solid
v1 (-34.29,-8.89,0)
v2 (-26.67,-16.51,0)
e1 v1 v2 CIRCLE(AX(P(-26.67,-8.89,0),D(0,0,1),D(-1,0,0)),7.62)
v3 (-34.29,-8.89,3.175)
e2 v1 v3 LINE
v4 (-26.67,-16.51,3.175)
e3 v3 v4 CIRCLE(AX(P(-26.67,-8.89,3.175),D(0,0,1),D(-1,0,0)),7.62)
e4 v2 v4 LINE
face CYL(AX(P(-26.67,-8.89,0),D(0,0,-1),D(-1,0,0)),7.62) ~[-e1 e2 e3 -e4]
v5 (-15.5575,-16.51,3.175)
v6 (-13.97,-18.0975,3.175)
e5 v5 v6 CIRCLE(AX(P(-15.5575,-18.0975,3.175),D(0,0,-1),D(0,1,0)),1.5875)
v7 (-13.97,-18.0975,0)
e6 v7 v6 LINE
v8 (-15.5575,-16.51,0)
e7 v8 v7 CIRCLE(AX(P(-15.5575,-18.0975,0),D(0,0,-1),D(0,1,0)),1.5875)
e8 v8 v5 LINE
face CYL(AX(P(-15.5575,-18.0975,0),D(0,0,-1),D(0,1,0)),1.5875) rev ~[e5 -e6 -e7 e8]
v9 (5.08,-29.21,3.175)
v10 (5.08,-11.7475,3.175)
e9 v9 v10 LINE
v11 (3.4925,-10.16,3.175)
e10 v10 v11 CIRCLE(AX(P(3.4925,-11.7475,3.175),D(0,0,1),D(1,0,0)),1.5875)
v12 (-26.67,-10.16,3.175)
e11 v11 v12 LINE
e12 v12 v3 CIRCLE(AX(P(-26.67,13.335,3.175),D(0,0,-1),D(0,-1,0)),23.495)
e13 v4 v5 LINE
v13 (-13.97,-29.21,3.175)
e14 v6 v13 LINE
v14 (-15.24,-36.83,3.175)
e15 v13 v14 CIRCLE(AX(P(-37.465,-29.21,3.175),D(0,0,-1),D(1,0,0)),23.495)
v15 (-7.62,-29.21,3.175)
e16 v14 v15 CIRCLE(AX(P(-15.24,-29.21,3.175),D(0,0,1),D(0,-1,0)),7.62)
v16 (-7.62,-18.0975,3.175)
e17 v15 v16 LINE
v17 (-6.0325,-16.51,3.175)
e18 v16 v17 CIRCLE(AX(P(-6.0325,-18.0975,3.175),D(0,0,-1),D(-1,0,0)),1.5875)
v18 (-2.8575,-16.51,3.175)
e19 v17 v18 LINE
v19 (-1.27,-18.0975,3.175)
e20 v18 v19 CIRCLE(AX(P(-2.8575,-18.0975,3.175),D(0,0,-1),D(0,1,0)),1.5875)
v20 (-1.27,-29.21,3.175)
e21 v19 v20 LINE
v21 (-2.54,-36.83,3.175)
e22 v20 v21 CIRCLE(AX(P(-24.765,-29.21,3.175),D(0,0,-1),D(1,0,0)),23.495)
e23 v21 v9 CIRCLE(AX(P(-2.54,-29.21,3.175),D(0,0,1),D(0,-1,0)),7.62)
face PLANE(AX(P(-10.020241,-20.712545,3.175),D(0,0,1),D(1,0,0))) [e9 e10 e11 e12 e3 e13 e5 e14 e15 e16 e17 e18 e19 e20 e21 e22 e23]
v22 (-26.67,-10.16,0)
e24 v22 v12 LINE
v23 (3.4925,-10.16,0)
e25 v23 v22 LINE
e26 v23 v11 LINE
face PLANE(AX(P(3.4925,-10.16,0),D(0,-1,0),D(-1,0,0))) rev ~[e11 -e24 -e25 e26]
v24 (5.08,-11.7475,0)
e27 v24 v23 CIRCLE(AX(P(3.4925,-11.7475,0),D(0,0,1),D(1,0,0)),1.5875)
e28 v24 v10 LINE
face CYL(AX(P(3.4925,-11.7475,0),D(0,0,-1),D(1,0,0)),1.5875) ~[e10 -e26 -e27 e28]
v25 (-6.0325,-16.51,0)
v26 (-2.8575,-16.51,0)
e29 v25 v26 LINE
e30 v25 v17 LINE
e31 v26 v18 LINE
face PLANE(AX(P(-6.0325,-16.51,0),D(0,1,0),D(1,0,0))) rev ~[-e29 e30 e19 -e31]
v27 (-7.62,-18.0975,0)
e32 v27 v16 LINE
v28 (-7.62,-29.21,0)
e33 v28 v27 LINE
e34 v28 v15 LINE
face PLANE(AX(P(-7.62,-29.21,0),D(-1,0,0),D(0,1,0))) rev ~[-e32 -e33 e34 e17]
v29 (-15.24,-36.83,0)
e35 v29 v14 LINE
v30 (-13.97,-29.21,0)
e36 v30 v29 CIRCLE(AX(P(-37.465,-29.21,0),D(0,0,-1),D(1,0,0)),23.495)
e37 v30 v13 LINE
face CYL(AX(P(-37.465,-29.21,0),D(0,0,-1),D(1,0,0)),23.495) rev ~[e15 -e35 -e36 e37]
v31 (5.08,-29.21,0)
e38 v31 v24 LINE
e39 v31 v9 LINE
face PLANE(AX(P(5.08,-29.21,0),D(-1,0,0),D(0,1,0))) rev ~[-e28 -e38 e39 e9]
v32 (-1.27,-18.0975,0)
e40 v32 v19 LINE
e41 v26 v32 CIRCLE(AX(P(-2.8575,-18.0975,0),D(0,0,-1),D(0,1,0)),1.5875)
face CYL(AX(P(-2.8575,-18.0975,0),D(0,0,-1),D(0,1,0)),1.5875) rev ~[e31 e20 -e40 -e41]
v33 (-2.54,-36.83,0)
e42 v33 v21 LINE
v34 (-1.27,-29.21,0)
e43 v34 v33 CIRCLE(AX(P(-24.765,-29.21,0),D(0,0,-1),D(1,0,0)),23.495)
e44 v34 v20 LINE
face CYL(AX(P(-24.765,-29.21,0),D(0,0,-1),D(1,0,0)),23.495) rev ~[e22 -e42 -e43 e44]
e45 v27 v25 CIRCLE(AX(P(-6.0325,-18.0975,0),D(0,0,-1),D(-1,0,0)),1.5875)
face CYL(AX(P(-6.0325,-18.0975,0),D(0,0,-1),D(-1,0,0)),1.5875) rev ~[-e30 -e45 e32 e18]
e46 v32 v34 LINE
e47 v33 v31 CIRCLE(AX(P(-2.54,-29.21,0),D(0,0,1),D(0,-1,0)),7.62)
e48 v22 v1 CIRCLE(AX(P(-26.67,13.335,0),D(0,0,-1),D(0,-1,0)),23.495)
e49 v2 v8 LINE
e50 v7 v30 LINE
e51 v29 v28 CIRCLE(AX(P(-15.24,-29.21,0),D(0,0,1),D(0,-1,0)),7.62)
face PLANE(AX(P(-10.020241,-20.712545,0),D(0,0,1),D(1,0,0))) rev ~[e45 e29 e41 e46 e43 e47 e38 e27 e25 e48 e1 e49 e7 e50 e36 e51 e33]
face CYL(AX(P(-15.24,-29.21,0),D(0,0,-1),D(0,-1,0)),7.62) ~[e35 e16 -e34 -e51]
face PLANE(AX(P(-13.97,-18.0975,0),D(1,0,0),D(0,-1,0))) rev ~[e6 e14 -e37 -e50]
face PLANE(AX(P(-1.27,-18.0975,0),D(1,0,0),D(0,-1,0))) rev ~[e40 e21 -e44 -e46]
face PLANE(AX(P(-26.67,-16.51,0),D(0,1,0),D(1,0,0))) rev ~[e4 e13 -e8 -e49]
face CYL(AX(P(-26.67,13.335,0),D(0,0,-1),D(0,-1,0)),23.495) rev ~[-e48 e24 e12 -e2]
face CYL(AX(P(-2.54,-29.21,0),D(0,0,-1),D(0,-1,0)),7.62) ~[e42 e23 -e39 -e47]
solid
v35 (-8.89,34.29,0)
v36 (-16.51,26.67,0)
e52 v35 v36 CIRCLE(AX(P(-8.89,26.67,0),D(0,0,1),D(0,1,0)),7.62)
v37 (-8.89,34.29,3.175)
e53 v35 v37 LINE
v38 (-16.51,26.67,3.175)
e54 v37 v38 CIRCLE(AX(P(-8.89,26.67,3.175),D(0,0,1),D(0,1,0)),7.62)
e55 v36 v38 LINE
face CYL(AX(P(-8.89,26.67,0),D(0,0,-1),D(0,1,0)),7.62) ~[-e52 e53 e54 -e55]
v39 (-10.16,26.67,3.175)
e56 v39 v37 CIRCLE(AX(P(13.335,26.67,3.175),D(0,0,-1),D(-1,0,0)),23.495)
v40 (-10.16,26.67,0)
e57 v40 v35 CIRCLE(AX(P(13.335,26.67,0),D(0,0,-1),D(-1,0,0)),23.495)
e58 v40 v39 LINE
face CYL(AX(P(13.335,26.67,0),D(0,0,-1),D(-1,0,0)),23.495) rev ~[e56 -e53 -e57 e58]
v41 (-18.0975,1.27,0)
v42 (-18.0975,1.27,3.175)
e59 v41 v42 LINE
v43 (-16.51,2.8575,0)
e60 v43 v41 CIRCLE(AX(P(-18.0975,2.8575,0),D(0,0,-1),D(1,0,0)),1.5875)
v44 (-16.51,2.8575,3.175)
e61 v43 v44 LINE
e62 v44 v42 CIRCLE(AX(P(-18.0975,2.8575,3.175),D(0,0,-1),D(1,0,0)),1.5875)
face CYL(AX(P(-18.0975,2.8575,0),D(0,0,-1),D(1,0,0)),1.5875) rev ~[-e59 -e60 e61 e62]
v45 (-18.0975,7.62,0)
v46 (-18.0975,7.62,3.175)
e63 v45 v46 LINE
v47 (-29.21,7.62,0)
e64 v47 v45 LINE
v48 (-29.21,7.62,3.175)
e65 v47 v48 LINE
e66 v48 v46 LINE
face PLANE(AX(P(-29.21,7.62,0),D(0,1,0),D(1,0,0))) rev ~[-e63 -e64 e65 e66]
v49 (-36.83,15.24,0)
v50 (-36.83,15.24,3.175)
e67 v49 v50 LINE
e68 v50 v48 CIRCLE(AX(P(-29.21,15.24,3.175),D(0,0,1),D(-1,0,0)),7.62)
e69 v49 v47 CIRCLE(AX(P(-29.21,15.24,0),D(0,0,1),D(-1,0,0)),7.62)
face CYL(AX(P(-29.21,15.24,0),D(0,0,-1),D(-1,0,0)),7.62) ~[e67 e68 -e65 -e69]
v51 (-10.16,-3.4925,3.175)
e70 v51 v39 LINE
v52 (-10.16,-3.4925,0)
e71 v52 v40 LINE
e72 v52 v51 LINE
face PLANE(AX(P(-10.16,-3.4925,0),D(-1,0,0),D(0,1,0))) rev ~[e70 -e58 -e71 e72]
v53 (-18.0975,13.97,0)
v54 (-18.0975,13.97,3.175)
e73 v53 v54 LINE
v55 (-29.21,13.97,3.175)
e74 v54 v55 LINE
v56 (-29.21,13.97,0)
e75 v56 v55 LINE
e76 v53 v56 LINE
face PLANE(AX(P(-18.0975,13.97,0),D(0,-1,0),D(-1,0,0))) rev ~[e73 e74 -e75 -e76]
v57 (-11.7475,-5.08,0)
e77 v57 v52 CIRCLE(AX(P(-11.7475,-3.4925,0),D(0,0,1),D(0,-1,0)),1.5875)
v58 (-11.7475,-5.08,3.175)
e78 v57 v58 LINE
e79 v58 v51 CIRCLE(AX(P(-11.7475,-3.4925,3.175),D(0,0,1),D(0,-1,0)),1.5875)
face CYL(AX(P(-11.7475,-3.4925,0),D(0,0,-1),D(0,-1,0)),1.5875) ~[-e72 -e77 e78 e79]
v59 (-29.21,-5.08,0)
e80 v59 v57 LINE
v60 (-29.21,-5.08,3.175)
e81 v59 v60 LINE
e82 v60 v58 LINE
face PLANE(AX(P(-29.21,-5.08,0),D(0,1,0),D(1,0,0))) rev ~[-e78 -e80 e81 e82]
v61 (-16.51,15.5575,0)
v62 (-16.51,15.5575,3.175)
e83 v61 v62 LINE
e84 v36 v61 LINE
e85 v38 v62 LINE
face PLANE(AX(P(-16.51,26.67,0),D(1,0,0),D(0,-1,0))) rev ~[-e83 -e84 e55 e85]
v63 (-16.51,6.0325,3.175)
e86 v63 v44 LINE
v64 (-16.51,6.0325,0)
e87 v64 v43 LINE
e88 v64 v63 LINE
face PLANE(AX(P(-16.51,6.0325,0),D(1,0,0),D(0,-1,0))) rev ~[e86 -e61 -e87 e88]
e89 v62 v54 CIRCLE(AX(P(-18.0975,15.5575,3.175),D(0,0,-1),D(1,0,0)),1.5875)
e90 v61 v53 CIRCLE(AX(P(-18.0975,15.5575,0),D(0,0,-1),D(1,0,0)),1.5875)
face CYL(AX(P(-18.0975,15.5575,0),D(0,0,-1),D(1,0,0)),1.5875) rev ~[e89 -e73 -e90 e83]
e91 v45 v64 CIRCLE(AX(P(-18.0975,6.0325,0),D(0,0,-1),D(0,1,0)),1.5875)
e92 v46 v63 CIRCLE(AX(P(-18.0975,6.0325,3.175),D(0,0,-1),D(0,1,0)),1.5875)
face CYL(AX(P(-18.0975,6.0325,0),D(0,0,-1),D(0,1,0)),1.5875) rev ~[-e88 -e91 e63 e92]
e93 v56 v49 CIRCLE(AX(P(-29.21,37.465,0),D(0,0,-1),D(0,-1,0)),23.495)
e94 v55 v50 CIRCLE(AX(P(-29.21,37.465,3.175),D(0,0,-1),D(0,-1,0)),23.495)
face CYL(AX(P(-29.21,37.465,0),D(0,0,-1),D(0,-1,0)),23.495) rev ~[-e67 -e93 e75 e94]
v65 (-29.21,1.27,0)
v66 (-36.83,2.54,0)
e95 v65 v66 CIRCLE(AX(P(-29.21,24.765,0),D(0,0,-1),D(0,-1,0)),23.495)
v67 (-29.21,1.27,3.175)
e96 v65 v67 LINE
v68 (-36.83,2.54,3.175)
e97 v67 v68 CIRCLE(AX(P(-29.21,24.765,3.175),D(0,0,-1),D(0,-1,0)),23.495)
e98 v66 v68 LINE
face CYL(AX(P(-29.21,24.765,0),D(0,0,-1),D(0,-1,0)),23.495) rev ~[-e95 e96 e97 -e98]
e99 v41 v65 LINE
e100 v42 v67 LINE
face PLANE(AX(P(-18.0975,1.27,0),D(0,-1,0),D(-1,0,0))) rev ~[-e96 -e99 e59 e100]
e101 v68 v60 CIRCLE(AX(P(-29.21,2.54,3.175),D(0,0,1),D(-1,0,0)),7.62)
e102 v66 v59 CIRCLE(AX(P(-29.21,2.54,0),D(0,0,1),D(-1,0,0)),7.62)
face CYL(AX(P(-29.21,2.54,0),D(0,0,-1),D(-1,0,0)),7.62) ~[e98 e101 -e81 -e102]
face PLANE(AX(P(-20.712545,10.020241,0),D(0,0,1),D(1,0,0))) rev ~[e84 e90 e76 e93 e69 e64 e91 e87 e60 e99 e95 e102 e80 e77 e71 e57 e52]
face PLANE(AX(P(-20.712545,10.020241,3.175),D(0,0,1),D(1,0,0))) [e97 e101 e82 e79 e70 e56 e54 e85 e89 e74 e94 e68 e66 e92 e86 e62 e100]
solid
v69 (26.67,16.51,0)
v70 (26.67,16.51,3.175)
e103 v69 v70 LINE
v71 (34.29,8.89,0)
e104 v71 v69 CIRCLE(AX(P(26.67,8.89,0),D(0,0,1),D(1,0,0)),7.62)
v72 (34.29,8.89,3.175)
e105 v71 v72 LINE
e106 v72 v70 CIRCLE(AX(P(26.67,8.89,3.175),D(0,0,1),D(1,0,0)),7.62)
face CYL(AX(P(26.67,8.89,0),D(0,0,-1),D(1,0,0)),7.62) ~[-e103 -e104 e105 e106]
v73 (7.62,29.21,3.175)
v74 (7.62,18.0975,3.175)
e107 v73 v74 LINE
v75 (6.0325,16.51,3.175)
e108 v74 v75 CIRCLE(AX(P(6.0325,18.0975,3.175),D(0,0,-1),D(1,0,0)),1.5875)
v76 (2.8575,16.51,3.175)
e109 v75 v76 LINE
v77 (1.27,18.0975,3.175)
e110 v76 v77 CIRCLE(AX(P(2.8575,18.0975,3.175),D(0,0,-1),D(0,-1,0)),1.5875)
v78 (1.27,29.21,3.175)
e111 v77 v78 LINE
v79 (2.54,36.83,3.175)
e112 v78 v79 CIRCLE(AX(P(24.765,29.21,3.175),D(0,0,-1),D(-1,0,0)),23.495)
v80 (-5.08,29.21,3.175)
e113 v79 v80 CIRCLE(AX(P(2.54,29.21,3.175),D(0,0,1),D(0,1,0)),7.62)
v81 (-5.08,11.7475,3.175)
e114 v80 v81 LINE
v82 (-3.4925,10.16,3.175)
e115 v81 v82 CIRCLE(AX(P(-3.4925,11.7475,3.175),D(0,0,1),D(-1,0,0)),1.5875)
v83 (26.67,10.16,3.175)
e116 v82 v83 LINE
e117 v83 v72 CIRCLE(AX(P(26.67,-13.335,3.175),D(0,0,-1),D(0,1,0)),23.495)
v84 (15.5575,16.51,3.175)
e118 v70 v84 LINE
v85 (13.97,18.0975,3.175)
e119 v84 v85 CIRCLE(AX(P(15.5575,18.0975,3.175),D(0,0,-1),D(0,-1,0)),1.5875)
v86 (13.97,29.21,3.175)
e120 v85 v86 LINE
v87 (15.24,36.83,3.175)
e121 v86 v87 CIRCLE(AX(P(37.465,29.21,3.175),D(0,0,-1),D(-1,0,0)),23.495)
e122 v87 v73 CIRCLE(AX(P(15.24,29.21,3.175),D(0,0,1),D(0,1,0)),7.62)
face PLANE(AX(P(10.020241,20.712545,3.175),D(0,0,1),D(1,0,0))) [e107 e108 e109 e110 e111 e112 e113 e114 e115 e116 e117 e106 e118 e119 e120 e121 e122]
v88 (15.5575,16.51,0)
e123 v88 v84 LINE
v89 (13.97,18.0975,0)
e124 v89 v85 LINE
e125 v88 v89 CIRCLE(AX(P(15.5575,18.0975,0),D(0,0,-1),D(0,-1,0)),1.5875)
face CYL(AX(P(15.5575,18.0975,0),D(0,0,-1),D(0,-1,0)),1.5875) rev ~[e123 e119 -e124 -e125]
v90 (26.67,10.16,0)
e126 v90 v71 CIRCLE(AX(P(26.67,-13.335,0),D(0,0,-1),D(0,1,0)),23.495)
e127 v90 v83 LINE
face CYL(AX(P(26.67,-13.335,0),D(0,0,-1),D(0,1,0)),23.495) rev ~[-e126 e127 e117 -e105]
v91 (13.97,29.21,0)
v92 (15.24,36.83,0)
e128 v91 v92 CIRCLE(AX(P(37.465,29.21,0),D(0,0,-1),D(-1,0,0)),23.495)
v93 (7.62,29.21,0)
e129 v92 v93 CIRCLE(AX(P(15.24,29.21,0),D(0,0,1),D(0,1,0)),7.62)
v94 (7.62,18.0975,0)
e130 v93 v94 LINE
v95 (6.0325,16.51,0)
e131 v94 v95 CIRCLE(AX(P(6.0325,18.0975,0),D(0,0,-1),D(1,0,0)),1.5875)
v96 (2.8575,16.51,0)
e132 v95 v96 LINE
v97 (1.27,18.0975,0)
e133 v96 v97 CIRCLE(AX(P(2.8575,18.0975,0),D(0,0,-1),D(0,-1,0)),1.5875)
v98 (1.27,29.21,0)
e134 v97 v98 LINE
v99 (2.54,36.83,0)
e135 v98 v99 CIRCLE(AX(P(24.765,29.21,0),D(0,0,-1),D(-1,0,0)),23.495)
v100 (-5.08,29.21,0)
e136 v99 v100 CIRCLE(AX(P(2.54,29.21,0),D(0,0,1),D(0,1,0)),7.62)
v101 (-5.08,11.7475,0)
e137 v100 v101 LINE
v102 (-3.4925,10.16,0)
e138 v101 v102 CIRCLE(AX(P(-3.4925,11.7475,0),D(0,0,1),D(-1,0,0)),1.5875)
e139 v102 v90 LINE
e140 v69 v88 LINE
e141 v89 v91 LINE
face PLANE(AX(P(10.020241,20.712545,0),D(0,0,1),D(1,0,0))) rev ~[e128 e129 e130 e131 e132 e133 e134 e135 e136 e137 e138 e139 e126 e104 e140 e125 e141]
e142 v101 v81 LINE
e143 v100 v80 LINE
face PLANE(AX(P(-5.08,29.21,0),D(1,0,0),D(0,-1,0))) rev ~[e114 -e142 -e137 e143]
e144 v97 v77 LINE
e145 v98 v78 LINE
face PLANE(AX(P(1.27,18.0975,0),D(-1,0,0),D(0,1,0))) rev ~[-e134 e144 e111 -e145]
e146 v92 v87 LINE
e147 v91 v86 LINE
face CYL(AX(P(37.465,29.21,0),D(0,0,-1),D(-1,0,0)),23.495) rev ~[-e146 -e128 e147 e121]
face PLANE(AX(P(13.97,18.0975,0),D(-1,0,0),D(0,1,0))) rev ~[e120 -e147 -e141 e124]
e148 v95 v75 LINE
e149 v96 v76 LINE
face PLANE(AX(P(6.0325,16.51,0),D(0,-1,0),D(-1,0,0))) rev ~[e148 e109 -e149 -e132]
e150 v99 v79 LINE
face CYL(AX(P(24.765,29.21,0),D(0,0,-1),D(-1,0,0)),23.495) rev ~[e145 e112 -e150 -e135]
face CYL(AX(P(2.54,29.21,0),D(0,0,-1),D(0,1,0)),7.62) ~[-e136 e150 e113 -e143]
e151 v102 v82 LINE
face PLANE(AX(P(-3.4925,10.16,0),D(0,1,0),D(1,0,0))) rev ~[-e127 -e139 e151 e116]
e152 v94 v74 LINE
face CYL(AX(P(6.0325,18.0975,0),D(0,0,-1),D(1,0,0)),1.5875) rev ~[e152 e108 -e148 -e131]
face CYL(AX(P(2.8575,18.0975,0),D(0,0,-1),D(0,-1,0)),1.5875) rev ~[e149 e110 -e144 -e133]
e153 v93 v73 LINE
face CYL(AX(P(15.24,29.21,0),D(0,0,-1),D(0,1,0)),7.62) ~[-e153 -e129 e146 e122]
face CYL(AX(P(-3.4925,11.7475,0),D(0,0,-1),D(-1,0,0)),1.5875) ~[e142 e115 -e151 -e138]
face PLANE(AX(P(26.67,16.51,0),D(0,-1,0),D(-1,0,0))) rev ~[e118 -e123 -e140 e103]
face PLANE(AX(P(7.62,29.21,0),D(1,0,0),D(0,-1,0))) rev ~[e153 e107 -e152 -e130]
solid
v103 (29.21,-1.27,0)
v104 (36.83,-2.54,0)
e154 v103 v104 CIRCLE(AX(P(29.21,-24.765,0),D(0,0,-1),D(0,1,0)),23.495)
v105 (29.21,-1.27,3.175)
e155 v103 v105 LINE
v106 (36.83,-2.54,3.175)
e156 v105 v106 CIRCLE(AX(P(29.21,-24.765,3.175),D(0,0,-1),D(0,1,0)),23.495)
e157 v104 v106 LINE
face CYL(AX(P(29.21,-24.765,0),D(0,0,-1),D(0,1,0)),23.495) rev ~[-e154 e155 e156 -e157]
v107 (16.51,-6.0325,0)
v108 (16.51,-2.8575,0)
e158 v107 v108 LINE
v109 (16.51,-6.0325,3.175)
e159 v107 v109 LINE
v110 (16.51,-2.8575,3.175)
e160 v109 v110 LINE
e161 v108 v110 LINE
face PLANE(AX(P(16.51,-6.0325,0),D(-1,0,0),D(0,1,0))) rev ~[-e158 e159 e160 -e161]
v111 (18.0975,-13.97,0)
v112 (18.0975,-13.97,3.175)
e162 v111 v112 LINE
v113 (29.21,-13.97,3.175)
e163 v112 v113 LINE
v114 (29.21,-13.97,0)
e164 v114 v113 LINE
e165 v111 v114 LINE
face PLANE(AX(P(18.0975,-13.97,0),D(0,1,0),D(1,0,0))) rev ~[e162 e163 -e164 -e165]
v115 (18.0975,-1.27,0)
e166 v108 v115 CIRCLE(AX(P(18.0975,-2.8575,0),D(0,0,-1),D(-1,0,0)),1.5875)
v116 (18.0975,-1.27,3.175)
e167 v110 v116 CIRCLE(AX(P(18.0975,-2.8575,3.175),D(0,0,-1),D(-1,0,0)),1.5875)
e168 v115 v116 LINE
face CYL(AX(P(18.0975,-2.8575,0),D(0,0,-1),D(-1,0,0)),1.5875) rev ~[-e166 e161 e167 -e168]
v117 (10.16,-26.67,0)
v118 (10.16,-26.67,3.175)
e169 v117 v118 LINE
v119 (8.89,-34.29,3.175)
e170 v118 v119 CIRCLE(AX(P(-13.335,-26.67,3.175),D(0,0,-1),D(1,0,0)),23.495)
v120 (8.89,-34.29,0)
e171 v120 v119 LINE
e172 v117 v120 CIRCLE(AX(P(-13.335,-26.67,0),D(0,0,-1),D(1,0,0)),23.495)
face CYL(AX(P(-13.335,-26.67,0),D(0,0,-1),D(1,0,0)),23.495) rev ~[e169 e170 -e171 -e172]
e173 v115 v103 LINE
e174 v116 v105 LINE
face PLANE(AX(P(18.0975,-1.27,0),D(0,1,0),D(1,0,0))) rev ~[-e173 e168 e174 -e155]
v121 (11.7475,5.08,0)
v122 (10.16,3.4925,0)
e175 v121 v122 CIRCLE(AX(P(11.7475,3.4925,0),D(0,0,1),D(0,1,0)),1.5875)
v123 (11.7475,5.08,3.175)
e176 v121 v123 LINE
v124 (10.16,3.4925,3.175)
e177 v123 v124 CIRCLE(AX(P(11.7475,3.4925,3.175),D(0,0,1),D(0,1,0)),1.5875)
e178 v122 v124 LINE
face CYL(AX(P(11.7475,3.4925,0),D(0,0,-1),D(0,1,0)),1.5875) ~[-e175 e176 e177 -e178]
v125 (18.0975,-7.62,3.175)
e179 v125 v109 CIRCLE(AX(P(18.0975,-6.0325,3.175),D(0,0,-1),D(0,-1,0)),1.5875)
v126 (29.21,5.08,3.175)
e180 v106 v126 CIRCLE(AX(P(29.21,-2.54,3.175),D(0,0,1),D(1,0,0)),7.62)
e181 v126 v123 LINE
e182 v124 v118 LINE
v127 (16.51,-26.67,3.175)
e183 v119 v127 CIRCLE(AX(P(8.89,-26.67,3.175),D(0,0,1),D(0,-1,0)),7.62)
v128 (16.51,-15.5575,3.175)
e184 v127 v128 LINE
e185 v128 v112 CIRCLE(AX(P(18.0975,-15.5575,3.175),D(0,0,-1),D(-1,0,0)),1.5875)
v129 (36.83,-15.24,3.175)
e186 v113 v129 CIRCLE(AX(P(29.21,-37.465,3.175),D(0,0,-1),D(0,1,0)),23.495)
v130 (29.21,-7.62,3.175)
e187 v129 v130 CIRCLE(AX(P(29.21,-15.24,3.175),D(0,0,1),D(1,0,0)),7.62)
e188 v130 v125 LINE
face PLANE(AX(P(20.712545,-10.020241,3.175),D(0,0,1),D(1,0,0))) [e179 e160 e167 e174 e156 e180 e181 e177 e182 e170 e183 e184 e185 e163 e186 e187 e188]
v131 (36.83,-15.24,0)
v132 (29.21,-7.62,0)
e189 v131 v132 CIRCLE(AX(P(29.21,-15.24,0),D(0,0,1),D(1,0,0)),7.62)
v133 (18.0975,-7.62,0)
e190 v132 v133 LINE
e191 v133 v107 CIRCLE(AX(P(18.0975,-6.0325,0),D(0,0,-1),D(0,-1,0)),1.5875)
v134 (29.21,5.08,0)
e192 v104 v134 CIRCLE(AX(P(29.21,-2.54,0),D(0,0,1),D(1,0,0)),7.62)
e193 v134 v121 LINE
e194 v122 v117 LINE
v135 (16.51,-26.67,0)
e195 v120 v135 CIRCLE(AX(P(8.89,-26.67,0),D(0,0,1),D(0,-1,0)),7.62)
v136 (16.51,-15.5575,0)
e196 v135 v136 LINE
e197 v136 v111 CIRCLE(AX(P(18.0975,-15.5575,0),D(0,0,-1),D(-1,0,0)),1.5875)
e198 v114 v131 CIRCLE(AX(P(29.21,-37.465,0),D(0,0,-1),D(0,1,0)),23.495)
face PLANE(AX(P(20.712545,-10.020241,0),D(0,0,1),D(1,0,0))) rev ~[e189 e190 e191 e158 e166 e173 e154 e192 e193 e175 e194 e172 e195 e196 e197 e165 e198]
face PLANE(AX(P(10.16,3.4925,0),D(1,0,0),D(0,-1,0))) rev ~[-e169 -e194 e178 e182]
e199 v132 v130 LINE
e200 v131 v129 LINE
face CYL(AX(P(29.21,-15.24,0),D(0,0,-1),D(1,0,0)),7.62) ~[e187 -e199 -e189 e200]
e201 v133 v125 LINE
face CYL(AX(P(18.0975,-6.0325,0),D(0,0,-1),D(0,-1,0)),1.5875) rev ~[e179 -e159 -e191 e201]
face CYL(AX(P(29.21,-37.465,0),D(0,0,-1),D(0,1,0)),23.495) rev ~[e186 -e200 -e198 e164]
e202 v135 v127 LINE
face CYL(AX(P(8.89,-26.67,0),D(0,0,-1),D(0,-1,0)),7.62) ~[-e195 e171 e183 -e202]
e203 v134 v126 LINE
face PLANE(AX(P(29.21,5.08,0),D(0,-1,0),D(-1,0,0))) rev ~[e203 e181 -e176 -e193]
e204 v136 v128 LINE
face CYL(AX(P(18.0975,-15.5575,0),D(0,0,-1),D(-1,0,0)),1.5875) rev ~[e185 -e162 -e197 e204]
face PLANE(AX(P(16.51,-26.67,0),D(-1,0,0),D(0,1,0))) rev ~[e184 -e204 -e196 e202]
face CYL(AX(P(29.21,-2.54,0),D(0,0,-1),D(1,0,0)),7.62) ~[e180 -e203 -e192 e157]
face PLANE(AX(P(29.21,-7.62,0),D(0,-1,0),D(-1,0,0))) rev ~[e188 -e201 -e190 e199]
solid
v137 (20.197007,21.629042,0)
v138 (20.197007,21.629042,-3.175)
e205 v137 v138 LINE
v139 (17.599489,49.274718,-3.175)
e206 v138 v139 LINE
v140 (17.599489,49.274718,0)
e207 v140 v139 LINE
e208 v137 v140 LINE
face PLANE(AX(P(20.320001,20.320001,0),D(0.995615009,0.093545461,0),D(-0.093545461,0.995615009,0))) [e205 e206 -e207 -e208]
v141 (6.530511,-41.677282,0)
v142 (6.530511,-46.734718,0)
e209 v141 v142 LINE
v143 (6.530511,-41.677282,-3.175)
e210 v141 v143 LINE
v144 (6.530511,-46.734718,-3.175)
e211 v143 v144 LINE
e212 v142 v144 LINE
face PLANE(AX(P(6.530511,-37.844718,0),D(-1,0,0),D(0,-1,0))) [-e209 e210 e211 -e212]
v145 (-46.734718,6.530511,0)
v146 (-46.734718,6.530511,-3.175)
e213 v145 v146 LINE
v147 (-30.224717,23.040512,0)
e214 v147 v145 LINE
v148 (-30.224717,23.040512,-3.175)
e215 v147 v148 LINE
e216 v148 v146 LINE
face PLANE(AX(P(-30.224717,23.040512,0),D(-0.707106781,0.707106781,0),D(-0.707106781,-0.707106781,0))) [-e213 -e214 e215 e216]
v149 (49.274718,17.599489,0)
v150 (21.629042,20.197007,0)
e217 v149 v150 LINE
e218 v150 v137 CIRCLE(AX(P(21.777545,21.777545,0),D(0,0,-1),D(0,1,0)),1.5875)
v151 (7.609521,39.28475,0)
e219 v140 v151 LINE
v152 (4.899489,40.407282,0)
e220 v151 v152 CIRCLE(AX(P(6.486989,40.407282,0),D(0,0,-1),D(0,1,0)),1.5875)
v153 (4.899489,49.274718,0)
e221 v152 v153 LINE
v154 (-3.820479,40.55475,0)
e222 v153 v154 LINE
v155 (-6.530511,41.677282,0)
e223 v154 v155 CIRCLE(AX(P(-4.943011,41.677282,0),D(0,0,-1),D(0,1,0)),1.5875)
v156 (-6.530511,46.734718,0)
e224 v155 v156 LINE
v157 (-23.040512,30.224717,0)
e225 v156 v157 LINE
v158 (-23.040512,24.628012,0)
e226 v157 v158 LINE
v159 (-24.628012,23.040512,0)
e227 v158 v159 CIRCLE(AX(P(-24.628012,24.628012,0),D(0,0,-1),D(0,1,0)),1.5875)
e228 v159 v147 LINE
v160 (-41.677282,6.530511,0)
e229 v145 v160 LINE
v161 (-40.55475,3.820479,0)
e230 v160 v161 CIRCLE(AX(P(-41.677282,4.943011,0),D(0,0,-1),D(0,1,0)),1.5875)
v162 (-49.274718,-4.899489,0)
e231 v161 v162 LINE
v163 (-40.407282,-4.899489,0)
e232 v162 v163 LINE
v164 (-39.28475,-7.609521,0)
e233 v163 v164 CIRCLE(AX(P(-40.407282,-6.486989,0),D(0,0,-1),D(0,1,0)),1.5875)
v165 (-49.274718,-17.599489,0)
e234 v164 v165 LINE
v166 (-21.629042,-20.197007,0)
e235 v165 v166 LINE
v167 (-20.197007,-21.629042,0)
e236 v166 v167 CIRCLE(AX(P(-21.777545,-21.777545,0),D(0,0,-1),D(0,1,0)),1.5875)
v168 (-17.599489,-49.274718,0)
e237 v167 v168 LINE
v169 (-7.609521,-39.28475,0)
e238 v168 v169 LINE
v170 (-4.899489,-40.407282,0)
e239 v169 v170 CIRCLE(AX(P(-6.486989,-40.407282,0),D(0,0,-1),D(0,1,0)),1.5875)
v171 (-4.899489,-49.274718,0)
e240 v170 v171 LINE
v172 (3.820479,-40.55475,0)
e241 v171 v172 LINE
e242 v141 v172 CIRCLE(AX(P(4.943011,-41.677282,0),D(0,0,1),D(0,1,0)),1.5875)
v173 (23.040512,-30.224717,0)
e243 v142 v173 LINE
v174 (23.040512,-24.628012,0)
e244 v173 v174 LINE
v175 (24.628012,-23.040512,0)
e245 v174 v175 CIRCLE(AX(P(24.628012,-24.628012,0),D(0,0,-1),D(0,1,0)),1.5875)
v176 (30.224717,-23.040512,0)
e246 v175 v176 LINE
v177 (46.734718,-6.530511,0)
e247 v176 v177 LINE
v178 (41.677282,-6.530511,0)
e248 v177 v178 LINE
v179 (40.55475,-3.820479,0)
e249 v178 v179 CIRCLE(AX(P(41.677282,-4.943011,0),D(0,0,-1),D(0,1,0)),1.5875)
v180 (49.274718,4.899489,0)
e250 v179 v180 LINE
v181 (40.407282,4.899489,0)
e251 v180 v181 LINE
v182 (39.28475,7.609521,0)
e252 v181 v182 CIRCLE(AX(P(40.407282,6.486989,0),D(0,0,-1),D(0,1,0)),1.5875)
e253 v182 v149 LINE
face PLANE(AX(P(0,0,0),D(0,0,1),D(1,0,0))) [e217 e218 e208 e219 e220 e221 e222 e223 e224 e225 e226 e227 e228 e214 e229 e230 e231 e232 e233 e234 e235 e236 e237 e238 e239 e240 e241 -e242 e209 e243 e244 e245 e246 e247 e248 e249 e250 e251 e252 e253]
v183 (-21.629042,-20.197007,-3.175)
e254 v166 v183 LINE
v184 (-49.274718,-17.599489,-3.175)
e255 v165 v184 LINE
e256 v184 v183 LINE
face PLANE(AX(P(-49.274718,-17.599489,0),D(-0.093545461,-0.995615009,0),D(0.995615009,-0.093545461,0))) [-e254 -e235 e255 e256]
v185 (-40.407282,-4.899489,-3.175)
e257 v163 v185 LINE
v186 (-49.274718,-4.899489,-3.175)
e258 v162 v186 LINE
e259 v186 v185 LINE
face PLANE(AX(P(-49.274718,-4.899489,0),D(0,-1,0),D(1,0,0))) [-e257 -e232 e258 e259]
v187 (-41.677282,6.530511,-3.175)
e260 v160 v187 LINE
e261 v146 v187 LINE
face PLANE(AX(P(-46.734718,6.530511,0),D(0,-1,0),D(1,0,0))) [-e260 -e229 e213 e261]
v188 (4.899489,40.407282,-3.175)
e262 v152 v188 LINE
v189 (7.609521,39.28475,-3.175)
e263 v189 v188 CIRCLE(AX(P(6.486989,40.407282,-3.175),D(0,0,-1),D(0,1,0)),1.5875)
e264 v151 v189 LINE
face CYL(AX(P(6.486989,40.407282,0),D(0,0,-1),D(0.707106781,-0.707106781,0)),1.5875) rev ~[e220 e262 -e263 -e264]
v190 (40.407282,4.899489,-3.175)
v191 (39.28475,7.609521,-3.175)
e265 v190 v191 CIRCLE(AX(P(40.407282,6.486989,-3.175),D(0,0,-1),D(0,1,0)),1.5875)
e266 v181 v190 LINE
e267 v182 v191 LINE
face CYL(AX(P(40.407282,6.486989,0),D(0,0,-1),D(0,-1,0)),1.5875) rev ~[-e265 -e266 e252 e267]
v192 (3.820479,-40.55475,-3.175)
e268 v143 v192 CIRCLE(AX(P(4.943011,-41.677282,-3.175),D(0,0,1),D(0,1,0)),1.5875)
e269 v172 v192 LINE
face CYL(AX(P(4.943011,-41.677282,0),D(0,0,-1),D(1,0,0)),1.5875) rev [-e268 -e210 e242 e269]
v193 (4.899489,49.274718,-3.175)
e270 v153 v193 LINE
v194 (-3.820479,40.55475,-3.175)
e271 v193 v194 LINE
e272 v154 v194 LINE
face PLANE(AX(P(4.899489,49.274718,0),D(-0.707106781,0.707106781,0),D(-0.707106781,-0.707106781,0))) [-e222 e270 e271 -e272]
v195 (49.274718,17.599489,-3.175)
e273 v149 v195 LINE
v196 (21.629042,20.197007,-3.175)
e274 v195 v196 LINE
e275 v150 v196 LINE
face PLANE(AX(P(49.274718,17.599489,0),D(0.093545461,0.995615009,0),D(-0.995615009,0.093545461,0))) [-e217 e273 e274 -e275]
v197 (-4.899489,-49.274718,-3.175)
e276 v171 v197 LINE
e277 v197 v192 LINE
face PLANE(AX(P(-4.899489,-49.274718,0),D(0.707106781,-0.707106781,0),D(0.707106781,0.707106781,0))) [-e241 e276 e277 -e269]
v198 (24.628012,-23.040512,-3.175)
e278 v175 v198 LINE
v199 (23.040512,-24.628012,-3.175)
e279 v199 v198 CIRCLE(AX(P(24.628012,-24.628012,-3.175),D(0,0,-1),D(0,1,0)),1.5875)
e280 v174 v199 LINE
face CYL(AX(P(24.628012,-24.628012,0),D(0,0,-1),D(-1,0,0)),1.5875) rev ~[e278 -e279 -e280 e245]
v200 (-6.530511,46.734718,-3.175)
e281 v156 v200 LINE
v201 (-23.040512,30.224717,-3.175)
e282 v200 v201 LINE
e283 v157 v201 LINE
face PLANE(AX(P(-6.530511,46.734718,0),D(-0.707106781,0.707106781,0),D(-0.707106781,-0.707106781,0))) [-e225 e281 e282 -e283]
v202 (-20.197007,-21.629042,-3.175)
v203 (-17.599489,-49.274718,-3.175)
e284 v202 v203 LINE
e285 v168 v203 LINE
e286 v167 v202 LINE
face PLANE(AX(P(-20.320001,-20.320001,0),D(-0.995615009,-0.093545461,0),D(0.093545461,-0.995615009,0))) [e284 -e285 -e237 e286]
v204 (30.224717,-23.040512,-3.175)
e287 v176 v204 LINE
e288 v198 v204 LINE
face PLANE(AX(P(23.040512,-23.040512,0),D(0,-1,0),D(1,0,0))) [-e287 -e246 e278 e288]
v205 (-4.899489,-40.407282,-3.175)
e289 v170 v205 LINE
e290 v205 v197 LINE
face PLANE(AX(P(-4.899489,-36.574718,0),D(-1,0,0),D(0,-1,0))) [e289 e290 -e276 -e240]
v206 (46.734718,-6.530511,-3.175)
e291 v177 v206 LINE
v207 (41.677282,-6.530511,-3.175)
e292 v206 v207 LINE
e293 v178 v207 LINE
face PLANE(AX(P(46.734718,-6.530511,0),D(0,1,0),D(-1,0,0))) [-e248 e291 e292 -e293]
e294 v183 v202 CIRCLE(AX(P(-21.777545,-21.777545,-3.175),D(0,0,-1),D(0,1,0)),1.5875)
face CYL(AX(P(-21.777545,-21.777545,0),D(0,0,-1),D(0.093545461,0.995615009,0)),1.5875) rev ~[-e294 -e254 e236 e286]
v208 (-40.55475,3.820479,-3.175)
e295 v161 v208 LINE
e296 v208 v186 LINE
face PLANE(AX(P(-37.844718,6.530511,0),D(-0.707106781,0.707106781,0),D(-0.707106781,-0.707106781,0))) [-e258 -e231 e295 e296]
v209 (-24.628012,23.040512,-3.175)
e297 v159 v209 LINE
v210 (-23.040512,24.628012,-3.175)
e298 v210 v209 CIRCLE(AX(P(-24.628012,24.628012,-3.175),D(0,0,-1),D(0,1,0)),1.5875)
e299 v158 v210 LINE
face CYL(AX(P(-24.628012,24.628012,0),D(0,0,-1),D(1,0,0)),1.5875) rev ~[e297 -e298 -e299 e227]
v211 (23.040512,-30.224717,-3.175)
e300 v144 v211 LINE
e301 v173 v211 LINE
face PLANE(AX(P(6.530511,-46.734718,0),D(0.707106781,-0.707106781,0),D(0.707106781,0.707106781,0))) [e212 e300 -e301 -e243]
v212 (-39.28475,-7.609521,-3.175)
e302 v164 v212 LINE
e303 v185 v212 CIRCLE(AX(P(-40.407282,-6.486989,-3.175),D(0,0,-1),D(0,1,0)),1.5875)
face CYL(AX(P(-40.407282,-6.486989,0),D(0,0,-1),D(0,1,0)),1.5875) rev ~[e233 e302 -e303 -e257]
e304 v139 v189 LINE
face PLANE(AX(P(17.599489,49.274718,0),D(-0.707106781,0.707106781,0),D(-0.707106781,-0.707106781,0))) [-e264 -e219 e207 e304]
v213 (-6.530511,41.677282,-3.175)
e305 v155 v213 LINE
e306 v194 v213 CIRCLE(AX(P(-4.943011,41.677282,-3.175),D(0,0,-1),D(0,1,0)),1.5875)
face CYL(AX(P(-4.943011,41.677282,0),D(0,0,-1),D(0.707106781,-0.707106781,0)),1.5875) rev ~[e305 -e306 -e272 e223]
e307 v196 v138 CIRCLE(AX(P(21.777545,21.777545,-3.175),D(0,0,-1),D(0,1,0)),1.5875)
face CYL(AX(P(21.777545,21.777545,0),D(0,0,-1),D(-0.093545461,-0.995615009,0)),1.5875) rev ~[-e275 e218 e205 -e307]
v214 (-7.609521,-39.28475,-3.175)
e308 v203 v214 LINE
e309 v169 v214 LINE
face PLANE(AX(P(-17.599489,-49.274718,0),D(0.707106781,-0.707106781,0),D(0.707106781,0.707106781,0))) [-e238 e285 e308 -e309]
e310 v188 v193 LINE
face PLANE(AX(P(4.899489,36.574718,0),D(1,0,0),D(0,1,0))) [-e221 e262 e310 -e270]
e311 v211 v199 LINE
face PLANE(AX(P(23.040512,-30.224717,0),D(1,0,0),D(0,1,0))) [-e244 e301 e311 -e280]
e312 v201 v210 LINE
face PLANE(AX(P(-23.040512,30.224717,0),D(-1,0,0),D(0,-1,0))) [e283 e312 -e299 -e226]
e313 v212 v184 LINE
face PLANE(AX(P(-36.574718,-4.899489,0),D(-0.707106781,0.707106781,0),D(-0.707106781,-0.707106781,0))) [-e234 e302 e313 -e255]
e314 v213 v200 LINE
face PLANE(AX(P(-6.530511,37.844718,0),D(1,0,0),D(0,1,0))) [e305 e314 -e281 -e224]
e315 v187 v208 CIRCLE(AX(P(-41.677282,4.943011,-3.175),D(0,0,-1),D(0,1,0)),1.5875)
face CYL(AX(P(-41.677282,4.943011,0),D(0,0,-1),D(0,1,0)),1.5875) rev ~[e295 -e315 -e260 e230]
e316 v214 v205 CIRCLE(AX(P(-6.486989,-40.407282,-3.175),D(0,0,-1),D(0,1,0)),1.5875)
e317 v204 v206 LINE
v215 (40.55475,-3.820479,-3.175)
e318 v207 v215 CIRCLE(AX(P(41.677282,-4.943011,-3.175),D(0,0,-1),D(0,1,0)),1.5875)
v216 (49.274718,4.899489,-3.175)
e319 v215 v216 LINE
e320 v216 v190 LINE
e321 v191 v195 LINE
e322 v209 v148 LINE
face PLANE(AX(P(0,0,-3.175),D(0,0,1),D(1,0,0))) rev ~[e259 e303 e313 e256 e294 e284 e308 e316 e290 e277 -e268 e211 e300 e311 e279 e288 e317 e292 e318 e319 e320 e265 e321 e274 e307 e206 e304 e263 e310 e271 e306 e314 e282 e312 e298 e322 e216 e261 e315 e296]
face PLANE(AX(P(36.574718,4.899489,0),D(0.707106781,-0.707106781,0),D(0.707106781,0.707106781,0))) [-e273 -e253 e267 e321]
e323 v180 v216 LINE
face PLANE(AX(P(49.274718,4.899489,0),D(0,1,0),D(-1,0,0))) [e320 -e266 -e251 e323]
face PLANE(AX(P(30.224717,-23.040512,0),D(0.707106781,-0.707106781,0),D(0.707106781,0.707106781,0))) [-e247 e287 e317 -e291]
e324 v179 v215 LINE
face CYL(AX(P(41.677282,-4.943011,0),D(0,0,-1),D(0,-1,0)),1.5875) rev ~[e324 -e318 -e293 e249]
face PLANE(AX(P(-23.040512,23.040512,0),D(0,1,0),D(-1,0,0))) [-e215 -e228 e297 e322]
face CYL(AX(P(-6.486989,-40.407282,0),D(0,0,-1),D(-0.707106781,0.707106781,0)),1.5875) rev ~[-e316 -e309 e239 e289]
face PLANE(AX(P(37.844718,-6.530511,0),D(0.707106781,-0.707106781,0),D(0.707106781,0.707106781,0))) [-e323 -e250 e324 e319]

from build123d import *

# Parameters (mm, degrees)
F1_DEPTH = 3.175
F3_DEPTH = 3.175
F4_R     = 1.5875


# Not quite as in the source:
# - a feature names something its author has since deleted; it is built from what else it names


with BuildPart() as f1:
    # F0 (on Top) → F1 (new body)
    with BuildSketch(Plane.XY):
        with BuildLine():
            ThreePointArc((11.7475, 5.08), (10.6249679849, 4.6150320151), (10.16, 3.4925))
            Line((10.16, 3.4925), (10.16, -26.67))
            ThreePointArc((10.16, -26.67), (9.8403252404, -30.5325542067), (8.89, -34.29))
            ThreePointArc((8.89, -34.29), (14.2781536726, -32.0581536726), (16.51, -26.67))
            Line((16.51, -26.67), (16.51, -15.5575))
            ThreePointArc((16.51, -15.5575), (16.9749679849, -14.4349679849), (18.0975, -13.97))
            Line((18.0975, -13.97), (29.21, -13.97))
            ThreePointArc((29.21, -13.97), (33.0725542067, -14.2896747596), (36.83, -15.24))
            ThreePointArc((36.83, -15.24), (34.5981536726, -9.8518463274), (29.21, -7.62))
            Line((29.21, -7.62), (18.0975, -7.62))
            ThreePointArc((18.0975, -7.62), (16.9749679849, -7.1550320151), (16.51, -6.0325))
            Line((16.51, -6.0325), (16.51, -2.8575))
            ThreePointArc((16.51, -2.8575), (16.9749679849, -1.7349679849), (18.0975, -1.27))
            Line((18.0975, -1.27), (29.21, -1.27))
            ThreePointArc((29.21, -1.27), (33.0725542067, -1.5896747596), (36.83, -2.54))
            ThreePointArc((36.83, -2.54), (34.5981536726, 2.8481536726), (29.21, 5.08))
            Line((29.21, 5.08), (11.7475, 5.08))
        make_face()
    extrude(amount=F1_DEPTH)


with BuildPart() as f1b:
    # F0 (on Top) → F1, piece 2 (new body)
    with BuildSketch(Plane.XY):
        with BuildLine():
            ThreePointArc((26.67, 10.16), (30.5325542067, 9.8403252404), (34.29, 8.89))
            ThreePointArc((34.29, 8.89), (32.0581536726, 14.2781536726), (26.67, 16.51))
            Line((26.67, 16.51), (15.5575, 16.51))
            ThreePointArc((15.5575, 16.51), (14.4349679849, 16.9749679849), (13.97, 18.0975))
            Line((13.97, 18.0975), (13.97, 29.21))
            ThreePointArc((13.97, 29.21), (14.2896747596, 33.0725542067), (15.24, 36.83))
            ThreePointArc((15.24, 36.83), (9.8518463274, 34.5981536726), (7.62, 29.21))
            Line((7.62, 29.21), (7.62, 18.0975))
            ThreePointArc((7.62, 18.0975), (7.1550320151, 16.9749679849), (6.0325, 16.51))
            Line((6.0325, 16.51), (2.8575, 16.51))
            ThreePointArc((2.8575, 16.51), (1.7349679849, 16.9749679849), (1.27, 18.0975))
            Line((1.27, 18.0975), (1.27, 29.21))
            ThreePointArc((1.27, 29.21), (1.5896747596, 33.0725542067), (2.54, 36.83))
            ThreePointArc((2.54, 36.83), (-2.8481536726, 34.5981536726), (-5.08, 29.21))
            Line((-5.08, 29.21), (-5.08, 11.7475))
            ThreePointArc((-5.08, 11.7475), (-4.6150320151, 10.6249679849), (-3.4925, 10.16))
            Line((-3.4925, 10.16), (26.67, 10.16))
        make_face()
    extrude(amount=F1_DEPTH)


with BuildPart() as f1c:
    # F0 (on Top) → F1, piece 3 (new body)
    with BuildSketch(Plane.XY):
        with BuildLine():
            ThreePointArc((-10.16, 26.67), (-9.8403252404, 30.5325542067), (-8.89, 34.29))
            ThreePointArc((-8.89, 34.29), (-14.2781536726, 32.0581536726), (-16.51, 26.67))
            Line((-16.51, 26.67), (-16.51, 15.5575))
            ThreePointArc((-16.51, 15.5575), (-16.9749679849, 14.4349679849), (-18.0975, 13.97))
            Line((-18.0975, 13.97), (-29.21, 13.97))
            ThreePointArc((-29.21, 13.97), (-33.0725542067, 14.2896747596), (-36.83, 15.24))
            ThreePointArc((-36.83, 15.24), (-34.5981536726, 9.8518463274), (-29.21, 7.62))
            Line((-29.21, 7.62), (-18.0975, 7.62))
            ThreePointArc((-18.0975, 7.62), (-16.9749679849, 7.1550320151), (-16.51, 6.0325))
            Line((-16.51, 6.0325), (-16.51, 2.8575))
            ThreePointArc((-16.51, 2.8575), (-16.9749679849, 1.7349679849), (-18.0975, 1.27))
            Line((-18.0975, 1.27), (-29.21, 1.27))
            ThreePointArc((-29.21, 1.27), (-33.0725542067, 1.5896747596), (-36.83, 2.54))
            ThreePointArc((-36.83, 2.54), (-34.5981536726, -2.8481536726), (-29.21, -5.08))
            Line((-29.21, -5.08), (-11.7475, -5.08))
            ThreePointArc((-11.7475, -5.08), (-10.6249679849, -4.6150320151), (-10.16, -3.4925))
            Line((-10.16, -3.4925), (-10.16, 26.67))
        make_face()
    extrude(amount=F1_DEPTH)


with BuildPart() as f1d:
    # F0 (on Top) → F1, piece 4 (new body)
    with BuildSketch(Plane.XY):
        with BuildLine():
            ThreePointArc((-26.67, -10.16), (-30.5325542067, -9.8403252404), (-34.29, -8.89))
            ThreePointArc((-34.29, -8.89), (-32.0581536726, -14.2781536726), (-26.67, -16.51))
            Line((-26.67, -16.51), (-15.5575, -16.51))
            ThreePointArc((-15.5575, -16.51), (-14.4349679849, -16.9749679849), (-13.97, -18.0975))
            Line((-13.97, -18.0975), (-13.97, -29.21))
            ThreePointArc((-13.97, -29.21), (-14.2896747596, -33.0725542067), (-15.24, -36.83))
            ThreePointArc((-15.24, -36.83), (-9.8518463274, -34.5981536726), (-7.62, -29.21))
            Line((-7.62, -29.21), (-7.62, -18.0975))
            ThreePointArc((-7.62, -18.0975), (-7.1550320151, -16.9749679849), (-6.0325, -16.51))
            Line((-6.0325, -16.51), (-2.8575, -16.51))
            ThreePointArc((-2.8575, -16.51), (-1.7349679849, -16.9749679849), (-1.27, -18.0975))
            Line((-1.27, -18.0975), (-1.27, -29.21))
            ThreePointArc((-1.27, -29.21), (-1.5896747596, -33.0725542067), (-2.54, -36.83))
            ThreePointArc((-2.54, -36.83), (2.8481536726, -34.5981536726), (5.08, -29.21))
            Line((5.08, -29.21), (5.08, -11.7475))
            ThreePointArc((5.08, -11.7475), (4.6150320151, -10.6249679849), (3.4925, -10.16))
            Line((3.4925, -10.16), (-26.67, -10.16))
        make_face()
    extrude(amount=F1_DEPTH)


with BuildPart() as f3:
    # F2 (on Top) → F3 (new body)
    with BuildSketch(Plane.XY):
        Polygon((6.5305114715, -37.8447175555), (6.5305114715, -46.7347176839), (23.0405122421, -30.2247169133), (23.0405122421, -23.0405122421), (30.2247169133, -23.0405122421), (46.7347176839, -6.5305114715), (37.8447175555, -6.5305114715), (49.2747179408, 4.8994889138), (36.5747179408, 4.8994889138), (49.2747179408, 17.5994889138), (20.3200007064, 20.3200007064), (17.5994889138, 49.2747179408), (4.8994889138, 36.5747179408), (4.8994889138, 49.2747179408), (-6.5305114715, 37.8447175555), (-6.5305114715, 46.7347176839), (-23.0405122421, 30.2247169133), (-23.0405122421, 23.0405122421), (-30.2247169133, 23.0405122421), (-46.7347176839, 6.5305114715), (-37.8447175555, 6.5305114715), (-49.2747179408, -4.8994889138), (-36.5747179408, -4.8994889138), (-49.2747179408, -17.5994889138), (-20.3200007064, -20.3200007064), (-17.5994889138, -49.2747179408), (-4.8994889138, -36.5747179408), (-4.8994889138, -49.2747179408), align=None)
    extrude(amount=-F3_DEPTH)

    # F4
    f4_edges = [f3.edges().sort_by_distance(p)[0] for p in [
        (-37.844718, 6.530511, -1.5875),
        (-36.574718, -4.899489, -1.5875),
        (-23.040512, 23.040512, -1.5875),
        (-6.530511, 37.844718, -1.5875),
        (4.899489, 36.574718, -1.5875),
        (-4.899489, -36.574718, -1.5875),
        (6.530511, -37.844718, -1.5875),
        (23.040512, -23.040512, -1.5875),
        (37.844718, -6.530511, -1.5875),
        (36.574718, 4.899489, -1.5875),
        (20.320001, 20.320001, -1.5875),
        (-20.320001, -20.320001, -1.5875),
    ]]
    fillet(f4_edges, radius=F4_R)


solid = Compound([f1.part, f1b.part, f1c.part, f1d.part, f3.part])
